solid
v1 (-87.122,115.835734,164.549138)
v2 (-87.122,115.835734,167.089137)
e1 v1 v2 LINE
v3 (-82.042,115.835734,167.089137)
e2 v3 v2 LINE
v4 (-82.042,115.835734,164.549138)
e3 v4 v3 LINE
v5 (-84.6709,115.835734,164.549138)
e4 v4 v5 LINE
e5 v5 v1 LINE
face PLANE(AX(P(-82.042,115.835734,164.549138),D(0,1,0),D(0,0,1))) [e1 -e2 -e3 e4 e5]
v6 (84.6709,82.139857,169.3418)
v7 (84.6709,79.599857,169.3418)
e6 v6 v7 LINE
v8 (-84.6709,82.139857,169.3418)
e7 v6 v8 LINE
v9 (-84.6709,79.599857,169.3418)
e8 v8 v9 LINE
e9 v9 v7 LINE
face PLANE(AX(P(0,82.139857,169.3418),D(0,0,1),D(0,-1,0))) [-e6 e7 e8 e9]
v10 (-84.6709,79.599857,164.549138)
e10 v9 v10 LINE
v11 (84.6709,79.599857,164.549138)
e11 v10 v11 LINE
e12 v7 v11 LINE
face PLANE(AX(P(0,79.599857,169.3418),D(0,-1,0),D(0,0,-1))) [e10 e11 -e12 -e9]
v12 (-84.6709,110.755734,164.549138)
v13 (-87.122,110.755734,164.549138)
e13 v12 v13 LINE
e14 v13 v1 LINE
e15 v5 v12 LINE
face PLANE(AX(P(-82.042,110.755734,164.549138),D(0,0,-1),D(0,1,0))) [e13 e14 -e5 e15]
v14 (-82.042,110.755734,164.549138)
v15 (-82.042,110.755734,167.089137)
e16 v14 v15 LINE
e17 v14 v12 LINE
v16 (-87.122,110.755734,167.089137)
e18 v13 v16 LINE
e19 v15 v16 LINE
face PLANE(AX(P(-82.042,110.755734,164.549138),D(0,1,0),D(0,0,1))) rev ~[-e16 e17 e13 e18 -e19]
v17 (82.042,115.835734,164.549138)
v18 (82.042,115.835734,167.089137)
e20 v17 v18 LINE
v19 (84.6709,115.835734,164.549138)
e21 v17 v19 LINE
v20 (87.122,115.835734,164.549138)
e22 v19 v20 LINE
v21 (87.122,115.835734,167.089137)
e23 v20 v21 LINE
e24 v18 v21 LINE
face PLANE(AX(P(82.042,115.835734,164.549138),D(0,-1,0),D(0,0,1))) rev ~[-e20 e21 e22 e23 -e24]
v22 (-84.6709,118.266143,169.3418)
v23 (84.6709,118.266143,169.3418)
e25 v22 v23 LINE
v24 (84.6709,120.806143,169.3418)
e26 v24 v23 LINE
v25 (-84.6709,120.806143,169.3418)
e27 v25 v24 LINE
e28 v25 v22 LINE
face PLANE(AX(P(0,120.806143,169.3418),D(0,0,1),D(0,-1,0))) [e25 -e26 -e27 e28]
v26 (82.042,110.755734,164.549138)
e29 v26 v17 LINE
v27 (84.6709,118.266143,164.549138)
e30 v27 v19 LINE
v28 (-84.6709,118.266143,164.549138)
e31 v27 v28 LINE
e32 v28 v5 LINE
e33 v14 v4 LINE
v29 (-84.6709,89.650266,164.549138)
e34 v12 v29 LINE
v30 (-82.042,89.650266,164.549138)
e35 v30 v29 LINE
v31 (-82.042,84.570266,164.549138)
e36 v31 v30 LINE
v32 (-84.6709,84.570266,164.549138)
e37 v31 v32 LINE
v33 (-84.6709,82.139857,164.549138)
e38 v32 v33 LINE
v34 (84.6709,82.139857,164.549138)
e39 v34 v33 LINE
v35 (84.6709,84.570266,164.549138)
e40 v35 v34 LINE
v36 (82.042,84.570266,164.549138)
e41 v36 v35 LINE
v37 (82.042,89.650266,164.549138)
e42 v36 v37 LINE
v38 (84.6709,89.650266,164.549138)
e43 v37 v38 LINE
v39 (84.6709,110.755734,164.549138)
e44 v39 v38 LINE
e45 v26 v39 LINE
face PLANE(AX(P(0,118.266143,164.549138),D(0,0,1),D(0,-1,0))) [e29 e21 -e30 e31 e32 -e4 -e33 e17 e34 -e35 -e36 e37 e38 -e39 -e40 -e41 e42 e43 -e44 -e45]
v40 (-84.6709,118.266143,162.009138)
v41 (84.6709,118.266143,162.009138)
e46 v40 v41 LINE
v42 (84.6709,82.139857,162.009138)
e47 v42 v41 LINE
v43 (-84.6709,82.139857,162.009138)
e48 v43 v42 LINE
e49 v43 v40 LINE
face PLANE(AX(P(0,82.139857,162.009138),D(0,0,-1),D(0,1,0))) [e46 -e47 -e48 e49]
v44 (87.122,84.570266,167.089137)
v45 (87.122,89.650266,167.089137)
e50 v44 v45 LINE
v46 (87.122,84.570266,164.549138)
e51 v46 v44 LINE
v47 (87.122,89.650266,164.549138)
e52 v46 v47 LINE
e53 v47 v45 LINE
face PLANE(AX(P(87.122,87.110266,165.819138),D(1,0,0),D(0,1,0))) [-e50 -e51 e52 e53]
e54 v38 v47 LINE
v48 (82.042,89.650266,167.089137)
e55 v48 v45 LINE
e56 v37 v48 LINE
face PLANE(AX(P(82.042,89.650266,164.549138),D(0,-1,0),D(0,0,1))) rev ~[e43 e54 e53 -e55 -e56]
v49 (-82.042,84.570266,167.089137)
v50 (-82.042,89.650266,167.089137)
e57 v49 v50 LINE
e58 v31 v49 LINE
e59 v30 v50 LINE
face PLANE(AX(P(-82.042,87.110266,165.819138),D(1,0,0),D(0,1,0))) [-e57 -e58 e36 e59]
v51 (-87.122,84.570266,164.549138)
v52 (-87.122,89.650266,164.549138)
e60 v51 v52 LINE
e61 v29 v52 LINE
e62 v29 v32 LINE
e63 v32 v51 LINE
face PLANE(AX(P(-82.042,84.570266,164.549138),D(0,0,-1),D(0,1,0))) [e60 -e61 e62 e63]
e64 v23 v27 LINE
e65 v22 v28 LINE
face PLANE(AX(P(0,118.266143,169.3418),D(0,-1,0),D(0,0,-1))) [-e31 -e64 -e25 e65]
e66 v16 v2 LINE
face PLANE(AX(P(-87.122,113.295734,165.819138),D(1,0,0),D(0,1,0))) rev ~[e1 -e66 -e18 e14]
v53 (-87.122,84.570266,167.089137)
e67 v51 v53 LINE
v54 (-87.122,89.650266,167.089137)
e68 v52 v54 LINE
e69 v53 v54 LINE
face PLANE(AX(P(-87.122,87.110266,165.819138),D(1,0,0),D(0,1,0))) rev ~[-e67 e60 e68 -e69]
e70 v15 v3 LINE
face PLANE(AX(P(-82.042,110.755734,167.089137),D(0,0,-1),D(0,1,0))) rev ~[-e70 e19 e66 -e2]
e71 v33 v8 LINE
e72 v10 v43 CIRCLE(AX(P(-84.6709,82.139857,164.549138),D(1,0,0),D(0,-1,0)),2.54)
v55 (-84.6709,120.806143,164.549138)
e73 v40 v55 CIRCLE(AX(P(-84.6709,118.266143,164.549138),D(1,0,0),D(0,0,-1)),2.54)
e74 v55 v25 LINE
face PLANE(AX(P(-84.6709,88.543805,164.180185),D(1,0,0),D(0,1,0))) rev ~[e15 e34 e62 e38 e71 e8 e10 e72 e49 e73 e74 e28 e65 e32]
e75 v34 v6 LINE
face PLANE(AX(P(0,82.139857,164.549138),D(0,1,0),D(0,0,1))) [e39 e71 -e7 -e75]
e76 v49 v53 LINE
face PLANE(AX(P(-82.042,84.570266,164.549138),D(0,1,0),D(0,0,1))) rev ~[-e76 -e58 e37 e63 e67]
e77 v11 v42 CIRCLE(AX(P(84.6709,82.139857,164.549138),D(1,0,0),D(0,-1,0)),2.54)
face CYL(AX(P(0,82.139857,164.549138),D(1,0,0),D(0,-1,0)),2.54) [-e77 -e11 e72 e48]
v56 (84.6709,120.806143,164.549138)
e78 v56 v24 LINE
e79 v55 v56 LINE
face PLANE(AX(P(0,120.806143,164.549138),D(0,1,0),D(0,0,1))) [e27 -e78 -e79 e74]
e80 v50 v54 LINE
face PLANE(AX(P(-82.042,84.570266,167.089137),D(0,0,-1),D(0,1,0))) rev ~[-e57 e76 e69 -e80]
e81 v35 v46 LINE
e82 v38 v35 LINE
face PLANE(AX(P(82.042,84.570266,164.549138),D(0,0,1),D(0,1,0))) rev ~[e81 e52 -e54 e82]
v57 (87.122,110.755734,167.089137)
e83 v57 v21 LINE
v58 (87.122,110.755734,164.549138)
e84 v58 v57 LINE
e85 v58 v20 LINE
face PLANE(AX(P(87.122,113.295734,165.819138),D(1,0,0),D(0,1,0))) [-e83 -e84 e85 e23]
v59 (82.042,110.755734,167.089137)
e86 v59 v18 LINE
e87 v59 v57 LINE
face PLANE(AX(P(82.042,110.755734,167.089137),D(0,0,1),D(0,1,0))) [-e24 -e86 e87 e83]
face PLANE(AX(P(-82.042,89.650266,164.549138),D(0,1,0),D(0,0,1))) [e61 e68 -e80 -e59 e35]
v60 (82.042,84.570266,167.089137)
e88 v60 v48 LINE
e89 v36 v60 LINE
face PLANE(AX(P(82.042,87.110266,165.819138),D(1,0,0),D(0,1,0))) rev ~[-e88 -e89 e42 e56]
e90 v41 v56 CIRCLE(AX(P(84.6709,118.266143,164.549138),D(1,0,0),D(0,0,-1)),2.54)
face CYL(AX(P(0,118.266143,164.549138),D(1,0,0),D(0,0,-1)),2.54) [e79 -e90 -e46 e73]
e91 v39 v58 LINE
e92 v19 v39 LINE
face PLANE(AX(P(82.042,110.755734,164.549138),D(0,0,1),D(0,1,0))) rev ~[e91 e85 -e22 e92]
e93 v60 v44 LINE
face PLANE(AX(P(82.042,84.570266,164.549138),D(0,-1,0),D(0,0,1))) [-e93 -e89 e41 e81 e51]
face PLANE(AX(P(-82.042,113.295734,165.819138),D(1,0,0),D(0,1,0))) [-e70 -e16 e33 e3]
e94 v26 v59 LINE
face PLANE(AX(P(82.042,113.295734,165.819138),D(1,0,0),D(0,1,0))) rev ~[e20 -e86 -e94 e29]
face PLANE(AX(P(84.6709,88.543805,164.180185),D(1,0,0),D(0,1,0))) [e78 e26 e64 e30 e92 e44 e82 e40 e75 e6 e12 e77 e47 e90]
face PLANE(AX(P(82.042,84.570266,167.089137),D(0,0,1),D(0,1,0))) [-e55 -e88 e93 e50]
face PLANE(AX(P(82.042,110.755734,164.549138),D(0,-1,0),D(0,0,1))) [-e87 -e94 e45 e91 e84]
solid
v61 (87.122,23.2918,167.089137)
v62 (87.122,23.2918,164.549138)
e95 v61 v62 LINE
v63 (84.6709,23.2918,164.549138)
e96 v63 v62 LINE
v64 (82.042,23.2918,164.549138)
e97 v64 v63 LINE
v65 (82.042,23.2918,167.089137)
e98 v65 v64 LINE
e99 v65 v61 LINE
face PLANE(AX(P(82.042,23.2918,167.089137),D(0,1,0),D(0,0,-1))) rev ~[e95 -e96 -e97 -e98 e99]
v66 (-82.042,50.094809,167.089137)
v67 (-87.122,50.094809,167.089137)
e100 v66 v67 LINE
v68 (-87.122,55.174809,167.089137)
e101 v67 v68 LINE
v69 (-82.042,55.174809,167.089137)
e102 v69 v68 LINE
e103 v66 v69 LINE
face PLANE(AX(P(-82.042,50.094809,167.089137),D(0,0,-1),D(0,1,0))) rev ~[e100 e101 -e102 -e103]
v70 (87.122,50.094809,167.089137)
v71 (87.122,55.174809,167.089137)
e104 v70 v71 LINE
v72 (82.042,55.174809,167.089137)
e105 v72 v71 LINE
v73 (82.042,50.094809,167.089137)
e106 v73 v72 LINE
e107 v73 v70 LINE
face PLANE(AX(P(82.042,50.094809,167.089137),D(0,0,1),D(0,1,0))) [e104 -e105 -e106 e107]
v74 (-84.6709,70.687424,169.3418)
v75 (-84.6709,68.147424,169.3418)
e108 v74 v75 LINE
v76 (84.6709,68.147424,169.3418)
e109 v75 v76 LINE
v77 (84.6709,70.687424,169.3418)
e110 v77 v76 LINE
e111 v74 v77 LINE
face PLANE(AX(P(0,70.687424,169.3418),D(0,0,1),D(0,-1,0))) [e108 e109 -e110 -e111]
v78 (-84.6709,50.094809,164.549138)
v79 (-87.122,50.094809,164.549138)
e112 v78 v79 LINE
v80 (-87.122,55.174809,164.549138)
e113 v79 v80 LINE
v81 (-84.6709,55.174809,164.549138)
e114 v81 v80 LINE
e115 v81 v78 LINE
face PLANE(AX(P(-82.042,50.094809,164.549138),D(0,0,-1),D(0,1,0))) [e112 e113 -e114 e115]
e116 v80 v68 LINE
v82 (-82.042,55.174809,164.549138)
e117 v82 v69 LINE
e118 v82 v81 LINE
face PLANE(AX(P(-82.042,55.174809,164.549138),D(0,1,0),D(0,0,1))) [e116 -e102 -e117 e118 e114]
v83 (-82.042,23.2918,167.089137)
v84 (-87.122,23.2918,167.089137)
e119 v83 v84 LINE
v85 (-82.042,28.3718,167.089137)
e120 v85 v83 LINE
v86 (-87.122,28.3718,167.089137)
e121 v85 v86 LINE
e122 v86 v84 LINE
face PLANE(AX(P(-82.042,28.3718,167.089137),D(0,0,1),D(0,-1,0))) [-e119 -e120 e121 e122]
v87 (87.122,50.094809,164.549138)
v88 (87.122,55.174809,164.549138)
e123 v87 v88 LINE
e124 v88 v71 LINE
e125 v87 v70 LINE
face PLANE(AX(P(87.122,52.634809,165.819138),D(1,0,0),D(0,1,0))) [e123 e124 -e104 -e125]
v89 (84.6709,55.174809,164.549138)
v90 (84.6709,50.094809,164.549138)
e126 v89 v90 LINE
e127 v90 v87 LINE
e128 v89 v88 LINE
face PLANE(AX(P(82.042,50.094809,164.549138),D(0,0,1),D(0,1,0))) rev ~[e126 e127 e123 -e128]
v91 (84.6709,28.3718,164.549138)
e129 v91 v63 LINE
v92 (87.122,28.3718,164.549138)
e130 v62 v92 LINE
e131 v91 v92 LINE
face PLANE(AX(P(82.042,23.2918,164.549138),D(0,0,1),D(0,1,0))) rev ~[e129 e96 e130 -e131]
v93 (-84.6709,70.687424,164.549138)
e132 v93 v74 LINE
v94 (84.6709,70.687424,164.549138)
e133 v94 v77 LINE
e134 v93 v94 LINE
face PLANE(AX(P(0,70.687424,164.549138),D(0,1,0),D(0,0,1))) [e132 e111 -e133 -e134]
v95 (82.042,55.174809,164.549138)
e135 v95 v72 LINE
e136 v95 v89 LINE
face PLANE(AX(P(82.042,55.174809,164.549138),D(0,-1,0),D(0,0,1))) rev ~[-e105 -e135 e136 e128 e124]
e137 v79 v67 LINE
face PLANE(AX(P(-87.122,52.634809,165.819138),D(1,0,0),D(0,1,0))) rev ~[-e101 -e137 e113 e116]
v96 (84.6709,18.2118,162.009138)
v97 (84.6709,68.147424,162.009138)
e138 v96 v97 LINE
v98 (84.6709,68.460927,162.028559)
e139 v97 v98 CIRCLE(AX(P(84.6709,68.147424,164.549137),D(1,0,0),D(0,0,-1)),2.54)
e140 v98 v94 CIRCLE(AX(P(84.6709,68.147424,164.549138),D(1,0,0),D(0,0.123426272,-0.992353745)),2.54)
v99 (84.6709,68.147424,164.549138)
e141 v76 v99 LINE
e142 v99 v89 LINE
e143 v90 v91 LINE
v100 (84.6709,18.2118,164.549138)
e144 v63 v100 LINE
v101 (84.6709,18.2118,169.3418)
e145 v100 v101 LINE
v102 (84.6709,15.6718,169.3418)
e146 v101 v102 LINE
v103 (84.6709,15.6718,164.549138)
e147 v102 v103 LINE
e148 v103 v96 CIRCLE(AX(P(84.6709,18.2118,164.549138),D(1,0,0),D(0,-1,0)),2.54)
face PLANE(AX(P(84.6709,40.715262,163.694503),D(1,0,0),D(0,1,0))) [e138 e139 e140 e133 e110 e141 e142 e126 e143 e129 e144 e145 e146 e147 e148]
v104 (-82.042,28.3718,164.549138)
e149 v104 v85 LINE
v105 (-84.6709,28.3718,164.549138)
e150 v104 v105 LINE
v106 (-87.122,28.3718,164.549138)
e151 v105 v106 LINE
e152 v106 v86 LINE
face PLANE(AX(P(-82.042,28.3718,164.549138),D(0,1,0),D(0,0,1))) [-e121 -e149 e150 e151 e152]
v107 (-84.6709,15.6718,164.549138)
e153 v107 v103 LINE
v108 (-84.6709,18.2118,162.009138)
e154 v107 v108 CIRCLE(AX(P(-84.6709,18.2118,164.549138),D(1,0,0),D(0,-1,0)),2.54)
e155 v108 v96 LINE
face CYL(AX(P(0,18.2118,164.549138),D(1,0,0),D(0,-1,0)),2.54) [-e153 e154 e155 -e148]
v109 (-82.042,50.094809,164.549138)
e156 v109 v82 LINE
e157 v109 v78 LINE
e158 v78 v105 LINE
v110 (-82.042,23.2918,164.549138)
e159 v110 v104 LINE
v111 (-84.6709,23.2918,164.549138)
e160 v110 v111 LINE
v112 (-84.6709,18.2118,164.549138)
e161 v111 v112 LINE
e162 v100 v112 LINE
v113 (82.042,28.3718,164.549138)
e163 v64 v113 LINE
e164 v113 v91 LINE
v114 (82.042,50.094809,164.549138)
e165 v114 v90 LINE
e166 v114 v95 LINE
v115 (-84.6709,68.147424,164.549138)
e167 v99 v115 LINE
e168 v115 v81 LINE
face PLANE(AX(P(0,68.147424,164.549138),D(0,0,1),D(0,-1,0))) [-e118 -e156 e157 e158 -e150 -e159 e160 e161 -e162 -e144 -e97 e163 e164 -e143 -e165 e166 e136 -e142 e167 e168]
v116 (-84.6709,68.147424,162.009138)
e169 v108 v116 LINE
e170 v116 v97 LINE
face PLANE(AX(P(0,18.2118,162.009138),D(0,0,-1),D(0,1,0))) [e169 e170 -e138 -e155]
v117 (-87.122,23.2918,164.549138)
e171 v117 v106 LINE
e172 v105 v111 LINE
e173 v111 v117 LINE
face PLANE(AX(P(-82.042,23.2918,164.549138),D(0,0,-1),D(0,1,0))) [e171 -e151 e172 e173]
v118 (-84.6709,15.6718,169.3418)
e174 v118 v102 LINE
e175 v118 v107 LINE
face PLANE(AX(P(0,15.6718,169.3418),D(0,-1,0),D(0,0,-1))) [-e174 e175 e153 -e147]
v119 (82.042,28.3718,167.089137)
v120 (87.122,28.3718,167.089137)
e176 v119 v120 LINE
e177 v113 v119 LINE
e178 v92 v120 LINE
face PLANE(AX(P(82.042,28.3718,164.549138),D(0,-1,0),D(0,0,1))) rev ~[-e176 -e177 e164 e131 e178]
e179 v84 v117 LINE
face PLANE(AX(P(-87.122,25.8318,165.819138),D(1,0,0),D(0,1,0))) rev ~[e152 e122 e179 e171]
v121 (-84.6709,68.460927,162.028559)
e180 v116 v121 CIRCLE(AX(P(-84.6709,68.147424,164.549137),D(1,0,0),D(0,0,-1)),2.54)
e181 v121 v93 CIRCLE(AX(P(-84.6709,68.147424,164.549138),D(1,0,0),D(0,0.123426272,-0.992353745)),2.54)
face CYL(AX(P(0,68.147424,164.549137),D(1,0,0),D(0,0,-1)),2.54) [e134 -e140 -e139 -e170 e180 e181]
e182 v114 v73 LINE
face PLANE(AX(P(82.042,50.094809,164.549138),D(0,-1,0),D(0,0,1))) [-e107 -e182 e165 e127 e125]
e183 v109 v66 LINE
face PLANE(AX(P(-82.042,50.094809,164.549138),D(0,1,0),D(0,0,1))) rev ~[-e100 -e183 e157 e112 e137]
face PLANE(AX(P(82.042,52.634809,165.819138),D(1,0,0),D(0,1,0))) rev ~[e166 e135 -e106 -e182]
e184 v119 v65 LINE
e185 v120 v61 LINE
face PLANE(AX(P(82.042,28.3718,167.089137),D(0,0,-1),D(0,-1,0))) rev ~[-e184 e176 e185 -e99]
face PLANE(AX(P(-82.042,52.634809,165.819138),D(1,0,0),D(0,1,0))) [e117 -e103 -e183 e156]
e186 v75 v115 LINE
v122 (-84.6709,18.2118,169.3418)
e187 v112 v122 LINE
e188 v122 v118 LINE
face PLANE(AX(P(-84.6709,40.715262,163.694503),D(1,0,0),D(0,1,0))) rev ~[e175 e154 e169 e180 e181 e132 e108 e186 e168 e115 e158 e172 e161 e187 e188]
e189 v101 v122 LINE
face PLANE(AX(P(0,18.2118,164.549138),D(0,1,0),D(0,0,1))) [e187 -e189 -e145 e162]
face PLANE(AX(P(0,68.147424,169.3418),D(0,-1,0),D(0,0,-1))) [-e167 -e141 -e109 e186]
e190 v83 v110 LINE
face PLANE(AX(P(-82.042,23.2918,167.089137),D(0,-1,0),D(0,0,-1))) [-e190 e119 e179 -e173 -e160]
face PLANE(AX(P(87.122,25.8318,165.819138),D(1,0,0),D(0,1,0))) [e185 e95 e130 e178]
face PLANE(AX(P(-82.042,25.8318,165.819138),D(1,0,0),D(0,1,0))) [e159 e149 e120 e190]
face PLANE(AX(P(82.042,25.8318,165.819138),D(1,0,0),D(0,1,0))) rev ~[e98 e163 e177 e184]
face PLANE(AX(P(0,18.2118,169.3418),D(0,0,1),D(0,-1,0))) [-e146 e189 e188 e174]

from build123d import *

# Parameters (mm, degrees)
F1_DEPTH = 84.6709
F2_START = 82.042
F0_W     = 5.08
F0_H     = 2.54
F2_DEPTH = 5.08
F3_START = -82.042
F3_DEPTH = 5.08


with BuildPart() as f1:
    # F0 (on Right) → F1 (new body, symmetric)
    with BuildSketch(Plane.YZ):
        with BuildLine():
            Line((18.2118, 169.3418), (15.6718, 169.3418))
            Line((15.6718, 169.3418), (15.6718, 164.5491375))
            ThreePointArc((15.6718, 164.5491375), (16.4157487758, 162.7530862758), (18.2118, 162.0091375))
            Line((18.2118, 162.0091375), (68.1474244764, 162.0091375))
            ThreePointArc((68.1474244764, 162.0091375), (68.3044763435, 162.0139975214), (68.4609272063, 162.0285589874))
            Line((68.4609272063, 162.0285589874), (69.6856973646, 162.9407926238))
            Line((69.6856973646, 162.9407926238), (68.1474244764, 165.0060867035))
            Line((68.1474244764, 165.0060867035), (68.1474244764, 164.5491375))
            Line((68.1474244764, 164.5491375), (55.1748093832, 164.5491375))
            Line((55.1748093832, 164.5491375), (50.0948093832, 164.5491375))
            Line((50.0948093832, 164.5491375), (28.3718, 164.5491375))
            Line((28.3718, 164.5491375), (23.2918, 164.5491375))
            Line((23.2918, 164.5491375), (18.2118, 164.5491375))
            Line((18.2118, 164.5491375), (18.2118, 169.3418))
        make_face()
        with BuildLine():
            Line((70.6874244764, 169.3418), (68.1474244764, 169.3418))
            Line((68.1474244764, 169.3418), (68.1474244764, 165.0060867035))
            Line((68.1474244764, 165.0060867035), (69.6856973646, 162.9407926238))
            Line((69.6856973646, 162.9407926238), (68.4609272063, 162.0285589874))
            ThreePointArc((68.4609272063, 162.0285589874), (70.0510915867, 162.8675752701), (70.6874244764, 164.5491375))
            Line((70.6874244764, 164.5491375), (70.6874244764, 165.8480664454))
            Line((70.6874244764, 165.8480664454), (70.6874244764, 169.3418))
        make_face()
    extrude(amount=F1_DEPTH, both=True)

    # F0 (on Right) → F2 (join)
    with BuildSketch(Plane.YZ.offset(F2_START)):
        with Locations((52.6348093832, 165.8191375)):
            Rectangle(F0_W, F0_H)
        Polygon((23.2918, 167.0891375), (23.2918, 164.5491375), (28.3718, 164.5491375), (28.3718, 167.0891375), align=None)
    extrude(amount=F2_DEPTH)

    # F0 (on Right) → F3 (join)
    with BuildSketch(Plane.YZ.offset(F3_START)):
        Polygon((23.2918, 167.0891375), (23.2918, 164.5491375), (28.3718, 164.5491375), (28.3718, 167.0891375), align=None)
        with Locations((52.6348093832, 165.8191375)):
            Rectangle(F0_W, F0_H)
    extrude(amount=-F3_DEPTH)


with BuildPart() as f1b:
    # F0 (on Right) → F1, piece 2 (new body, symmetric)
    with BuildSketch(Plane.YZ):
        with BuildLine():
            Line((82.1398573303, 169.3418), (79.5998573303, 169.3418))
            Line((79.5998573303, 169.3418), (79.5998573303, 164.5491375))
            ThreePointArc((79.5998573303, 164.5491375), (80.3438061061, 162.7530862758), (82.1398573303, 162.0091375))
            Line((82.1398573303, 162.0091375), (100.203, 162.0091375))
            Line((100.203, 162.0091375), (100.203, 164.5491375))
            Line((100.203, 164.5491375), (89.6502663064, 164.5491375))
            Line((89.6502663064, 164.5491375), (84.5702663064, 164.5491375))
            Line((84.5702663064, 164.5491375), (82.1398573303, 164.5491375))
            Line((82.1398573303, 164.5491375), (82.1398573303, 169.3418))
        make_face()
        with BuildLine():
            Line((120.8061426697, 169.3418), (118.2661426697, 169.3418))
            Line((118.2661426697, 169.3418), (118.2661426697, 164.5491375))
            Line((118.2661426697, 164.5491375), (115.8357336936, 164.5491375))
            Line((115.8357336936, 164.5491375), (110.7557336936, 164.5491375))
            Line((110.7557336936, 164.5491375), (100.203, 164.5491375))
            Line((100.203, 164.5491375), (100.203, 162.0091375))
            Line((100.203, 162.0091375), (118.2661426697, 162.0091375))
            ThreePointArc((118.2661426697, 162.0091375), (120.0621938939, 162.7530862758), (120.8061426697, 164.5491375))
            Line((120.8061426697, 164.5491375), (120.8061426697, 169.3418))
        make_face()
    extrude(amount=F1_DEPTH, both=True)

    # F0 (on Right) → F2, piece 2 (join)
    with BuildSketch(Plane.YZ.offset(F2_START)):
        with Locations((87.1102663064, 165.8191375)):
            Rectangle(F0_W, F0_H)
        with Locations((113.2957336936, 165.8191375)):
            Rectangle(F0_W, F0_H)
    extrude(amount=F2_DEPTH)

    # F0 (on Right) → F3, piece 2 (join)
    with BuildSketch(Plane.YZ.offset(F3_START)):
        with Locations((87.1102663064, 165.8191375)):
            Rectangle(F0_W, F0_H)
        with Locations((113.2957336936, 165.8191375)):
            Rectangle(F0_W, F0_H)
    extrude(amount=-F3_DEPTH)


solid = Compound([f1.part, f1b.part])
